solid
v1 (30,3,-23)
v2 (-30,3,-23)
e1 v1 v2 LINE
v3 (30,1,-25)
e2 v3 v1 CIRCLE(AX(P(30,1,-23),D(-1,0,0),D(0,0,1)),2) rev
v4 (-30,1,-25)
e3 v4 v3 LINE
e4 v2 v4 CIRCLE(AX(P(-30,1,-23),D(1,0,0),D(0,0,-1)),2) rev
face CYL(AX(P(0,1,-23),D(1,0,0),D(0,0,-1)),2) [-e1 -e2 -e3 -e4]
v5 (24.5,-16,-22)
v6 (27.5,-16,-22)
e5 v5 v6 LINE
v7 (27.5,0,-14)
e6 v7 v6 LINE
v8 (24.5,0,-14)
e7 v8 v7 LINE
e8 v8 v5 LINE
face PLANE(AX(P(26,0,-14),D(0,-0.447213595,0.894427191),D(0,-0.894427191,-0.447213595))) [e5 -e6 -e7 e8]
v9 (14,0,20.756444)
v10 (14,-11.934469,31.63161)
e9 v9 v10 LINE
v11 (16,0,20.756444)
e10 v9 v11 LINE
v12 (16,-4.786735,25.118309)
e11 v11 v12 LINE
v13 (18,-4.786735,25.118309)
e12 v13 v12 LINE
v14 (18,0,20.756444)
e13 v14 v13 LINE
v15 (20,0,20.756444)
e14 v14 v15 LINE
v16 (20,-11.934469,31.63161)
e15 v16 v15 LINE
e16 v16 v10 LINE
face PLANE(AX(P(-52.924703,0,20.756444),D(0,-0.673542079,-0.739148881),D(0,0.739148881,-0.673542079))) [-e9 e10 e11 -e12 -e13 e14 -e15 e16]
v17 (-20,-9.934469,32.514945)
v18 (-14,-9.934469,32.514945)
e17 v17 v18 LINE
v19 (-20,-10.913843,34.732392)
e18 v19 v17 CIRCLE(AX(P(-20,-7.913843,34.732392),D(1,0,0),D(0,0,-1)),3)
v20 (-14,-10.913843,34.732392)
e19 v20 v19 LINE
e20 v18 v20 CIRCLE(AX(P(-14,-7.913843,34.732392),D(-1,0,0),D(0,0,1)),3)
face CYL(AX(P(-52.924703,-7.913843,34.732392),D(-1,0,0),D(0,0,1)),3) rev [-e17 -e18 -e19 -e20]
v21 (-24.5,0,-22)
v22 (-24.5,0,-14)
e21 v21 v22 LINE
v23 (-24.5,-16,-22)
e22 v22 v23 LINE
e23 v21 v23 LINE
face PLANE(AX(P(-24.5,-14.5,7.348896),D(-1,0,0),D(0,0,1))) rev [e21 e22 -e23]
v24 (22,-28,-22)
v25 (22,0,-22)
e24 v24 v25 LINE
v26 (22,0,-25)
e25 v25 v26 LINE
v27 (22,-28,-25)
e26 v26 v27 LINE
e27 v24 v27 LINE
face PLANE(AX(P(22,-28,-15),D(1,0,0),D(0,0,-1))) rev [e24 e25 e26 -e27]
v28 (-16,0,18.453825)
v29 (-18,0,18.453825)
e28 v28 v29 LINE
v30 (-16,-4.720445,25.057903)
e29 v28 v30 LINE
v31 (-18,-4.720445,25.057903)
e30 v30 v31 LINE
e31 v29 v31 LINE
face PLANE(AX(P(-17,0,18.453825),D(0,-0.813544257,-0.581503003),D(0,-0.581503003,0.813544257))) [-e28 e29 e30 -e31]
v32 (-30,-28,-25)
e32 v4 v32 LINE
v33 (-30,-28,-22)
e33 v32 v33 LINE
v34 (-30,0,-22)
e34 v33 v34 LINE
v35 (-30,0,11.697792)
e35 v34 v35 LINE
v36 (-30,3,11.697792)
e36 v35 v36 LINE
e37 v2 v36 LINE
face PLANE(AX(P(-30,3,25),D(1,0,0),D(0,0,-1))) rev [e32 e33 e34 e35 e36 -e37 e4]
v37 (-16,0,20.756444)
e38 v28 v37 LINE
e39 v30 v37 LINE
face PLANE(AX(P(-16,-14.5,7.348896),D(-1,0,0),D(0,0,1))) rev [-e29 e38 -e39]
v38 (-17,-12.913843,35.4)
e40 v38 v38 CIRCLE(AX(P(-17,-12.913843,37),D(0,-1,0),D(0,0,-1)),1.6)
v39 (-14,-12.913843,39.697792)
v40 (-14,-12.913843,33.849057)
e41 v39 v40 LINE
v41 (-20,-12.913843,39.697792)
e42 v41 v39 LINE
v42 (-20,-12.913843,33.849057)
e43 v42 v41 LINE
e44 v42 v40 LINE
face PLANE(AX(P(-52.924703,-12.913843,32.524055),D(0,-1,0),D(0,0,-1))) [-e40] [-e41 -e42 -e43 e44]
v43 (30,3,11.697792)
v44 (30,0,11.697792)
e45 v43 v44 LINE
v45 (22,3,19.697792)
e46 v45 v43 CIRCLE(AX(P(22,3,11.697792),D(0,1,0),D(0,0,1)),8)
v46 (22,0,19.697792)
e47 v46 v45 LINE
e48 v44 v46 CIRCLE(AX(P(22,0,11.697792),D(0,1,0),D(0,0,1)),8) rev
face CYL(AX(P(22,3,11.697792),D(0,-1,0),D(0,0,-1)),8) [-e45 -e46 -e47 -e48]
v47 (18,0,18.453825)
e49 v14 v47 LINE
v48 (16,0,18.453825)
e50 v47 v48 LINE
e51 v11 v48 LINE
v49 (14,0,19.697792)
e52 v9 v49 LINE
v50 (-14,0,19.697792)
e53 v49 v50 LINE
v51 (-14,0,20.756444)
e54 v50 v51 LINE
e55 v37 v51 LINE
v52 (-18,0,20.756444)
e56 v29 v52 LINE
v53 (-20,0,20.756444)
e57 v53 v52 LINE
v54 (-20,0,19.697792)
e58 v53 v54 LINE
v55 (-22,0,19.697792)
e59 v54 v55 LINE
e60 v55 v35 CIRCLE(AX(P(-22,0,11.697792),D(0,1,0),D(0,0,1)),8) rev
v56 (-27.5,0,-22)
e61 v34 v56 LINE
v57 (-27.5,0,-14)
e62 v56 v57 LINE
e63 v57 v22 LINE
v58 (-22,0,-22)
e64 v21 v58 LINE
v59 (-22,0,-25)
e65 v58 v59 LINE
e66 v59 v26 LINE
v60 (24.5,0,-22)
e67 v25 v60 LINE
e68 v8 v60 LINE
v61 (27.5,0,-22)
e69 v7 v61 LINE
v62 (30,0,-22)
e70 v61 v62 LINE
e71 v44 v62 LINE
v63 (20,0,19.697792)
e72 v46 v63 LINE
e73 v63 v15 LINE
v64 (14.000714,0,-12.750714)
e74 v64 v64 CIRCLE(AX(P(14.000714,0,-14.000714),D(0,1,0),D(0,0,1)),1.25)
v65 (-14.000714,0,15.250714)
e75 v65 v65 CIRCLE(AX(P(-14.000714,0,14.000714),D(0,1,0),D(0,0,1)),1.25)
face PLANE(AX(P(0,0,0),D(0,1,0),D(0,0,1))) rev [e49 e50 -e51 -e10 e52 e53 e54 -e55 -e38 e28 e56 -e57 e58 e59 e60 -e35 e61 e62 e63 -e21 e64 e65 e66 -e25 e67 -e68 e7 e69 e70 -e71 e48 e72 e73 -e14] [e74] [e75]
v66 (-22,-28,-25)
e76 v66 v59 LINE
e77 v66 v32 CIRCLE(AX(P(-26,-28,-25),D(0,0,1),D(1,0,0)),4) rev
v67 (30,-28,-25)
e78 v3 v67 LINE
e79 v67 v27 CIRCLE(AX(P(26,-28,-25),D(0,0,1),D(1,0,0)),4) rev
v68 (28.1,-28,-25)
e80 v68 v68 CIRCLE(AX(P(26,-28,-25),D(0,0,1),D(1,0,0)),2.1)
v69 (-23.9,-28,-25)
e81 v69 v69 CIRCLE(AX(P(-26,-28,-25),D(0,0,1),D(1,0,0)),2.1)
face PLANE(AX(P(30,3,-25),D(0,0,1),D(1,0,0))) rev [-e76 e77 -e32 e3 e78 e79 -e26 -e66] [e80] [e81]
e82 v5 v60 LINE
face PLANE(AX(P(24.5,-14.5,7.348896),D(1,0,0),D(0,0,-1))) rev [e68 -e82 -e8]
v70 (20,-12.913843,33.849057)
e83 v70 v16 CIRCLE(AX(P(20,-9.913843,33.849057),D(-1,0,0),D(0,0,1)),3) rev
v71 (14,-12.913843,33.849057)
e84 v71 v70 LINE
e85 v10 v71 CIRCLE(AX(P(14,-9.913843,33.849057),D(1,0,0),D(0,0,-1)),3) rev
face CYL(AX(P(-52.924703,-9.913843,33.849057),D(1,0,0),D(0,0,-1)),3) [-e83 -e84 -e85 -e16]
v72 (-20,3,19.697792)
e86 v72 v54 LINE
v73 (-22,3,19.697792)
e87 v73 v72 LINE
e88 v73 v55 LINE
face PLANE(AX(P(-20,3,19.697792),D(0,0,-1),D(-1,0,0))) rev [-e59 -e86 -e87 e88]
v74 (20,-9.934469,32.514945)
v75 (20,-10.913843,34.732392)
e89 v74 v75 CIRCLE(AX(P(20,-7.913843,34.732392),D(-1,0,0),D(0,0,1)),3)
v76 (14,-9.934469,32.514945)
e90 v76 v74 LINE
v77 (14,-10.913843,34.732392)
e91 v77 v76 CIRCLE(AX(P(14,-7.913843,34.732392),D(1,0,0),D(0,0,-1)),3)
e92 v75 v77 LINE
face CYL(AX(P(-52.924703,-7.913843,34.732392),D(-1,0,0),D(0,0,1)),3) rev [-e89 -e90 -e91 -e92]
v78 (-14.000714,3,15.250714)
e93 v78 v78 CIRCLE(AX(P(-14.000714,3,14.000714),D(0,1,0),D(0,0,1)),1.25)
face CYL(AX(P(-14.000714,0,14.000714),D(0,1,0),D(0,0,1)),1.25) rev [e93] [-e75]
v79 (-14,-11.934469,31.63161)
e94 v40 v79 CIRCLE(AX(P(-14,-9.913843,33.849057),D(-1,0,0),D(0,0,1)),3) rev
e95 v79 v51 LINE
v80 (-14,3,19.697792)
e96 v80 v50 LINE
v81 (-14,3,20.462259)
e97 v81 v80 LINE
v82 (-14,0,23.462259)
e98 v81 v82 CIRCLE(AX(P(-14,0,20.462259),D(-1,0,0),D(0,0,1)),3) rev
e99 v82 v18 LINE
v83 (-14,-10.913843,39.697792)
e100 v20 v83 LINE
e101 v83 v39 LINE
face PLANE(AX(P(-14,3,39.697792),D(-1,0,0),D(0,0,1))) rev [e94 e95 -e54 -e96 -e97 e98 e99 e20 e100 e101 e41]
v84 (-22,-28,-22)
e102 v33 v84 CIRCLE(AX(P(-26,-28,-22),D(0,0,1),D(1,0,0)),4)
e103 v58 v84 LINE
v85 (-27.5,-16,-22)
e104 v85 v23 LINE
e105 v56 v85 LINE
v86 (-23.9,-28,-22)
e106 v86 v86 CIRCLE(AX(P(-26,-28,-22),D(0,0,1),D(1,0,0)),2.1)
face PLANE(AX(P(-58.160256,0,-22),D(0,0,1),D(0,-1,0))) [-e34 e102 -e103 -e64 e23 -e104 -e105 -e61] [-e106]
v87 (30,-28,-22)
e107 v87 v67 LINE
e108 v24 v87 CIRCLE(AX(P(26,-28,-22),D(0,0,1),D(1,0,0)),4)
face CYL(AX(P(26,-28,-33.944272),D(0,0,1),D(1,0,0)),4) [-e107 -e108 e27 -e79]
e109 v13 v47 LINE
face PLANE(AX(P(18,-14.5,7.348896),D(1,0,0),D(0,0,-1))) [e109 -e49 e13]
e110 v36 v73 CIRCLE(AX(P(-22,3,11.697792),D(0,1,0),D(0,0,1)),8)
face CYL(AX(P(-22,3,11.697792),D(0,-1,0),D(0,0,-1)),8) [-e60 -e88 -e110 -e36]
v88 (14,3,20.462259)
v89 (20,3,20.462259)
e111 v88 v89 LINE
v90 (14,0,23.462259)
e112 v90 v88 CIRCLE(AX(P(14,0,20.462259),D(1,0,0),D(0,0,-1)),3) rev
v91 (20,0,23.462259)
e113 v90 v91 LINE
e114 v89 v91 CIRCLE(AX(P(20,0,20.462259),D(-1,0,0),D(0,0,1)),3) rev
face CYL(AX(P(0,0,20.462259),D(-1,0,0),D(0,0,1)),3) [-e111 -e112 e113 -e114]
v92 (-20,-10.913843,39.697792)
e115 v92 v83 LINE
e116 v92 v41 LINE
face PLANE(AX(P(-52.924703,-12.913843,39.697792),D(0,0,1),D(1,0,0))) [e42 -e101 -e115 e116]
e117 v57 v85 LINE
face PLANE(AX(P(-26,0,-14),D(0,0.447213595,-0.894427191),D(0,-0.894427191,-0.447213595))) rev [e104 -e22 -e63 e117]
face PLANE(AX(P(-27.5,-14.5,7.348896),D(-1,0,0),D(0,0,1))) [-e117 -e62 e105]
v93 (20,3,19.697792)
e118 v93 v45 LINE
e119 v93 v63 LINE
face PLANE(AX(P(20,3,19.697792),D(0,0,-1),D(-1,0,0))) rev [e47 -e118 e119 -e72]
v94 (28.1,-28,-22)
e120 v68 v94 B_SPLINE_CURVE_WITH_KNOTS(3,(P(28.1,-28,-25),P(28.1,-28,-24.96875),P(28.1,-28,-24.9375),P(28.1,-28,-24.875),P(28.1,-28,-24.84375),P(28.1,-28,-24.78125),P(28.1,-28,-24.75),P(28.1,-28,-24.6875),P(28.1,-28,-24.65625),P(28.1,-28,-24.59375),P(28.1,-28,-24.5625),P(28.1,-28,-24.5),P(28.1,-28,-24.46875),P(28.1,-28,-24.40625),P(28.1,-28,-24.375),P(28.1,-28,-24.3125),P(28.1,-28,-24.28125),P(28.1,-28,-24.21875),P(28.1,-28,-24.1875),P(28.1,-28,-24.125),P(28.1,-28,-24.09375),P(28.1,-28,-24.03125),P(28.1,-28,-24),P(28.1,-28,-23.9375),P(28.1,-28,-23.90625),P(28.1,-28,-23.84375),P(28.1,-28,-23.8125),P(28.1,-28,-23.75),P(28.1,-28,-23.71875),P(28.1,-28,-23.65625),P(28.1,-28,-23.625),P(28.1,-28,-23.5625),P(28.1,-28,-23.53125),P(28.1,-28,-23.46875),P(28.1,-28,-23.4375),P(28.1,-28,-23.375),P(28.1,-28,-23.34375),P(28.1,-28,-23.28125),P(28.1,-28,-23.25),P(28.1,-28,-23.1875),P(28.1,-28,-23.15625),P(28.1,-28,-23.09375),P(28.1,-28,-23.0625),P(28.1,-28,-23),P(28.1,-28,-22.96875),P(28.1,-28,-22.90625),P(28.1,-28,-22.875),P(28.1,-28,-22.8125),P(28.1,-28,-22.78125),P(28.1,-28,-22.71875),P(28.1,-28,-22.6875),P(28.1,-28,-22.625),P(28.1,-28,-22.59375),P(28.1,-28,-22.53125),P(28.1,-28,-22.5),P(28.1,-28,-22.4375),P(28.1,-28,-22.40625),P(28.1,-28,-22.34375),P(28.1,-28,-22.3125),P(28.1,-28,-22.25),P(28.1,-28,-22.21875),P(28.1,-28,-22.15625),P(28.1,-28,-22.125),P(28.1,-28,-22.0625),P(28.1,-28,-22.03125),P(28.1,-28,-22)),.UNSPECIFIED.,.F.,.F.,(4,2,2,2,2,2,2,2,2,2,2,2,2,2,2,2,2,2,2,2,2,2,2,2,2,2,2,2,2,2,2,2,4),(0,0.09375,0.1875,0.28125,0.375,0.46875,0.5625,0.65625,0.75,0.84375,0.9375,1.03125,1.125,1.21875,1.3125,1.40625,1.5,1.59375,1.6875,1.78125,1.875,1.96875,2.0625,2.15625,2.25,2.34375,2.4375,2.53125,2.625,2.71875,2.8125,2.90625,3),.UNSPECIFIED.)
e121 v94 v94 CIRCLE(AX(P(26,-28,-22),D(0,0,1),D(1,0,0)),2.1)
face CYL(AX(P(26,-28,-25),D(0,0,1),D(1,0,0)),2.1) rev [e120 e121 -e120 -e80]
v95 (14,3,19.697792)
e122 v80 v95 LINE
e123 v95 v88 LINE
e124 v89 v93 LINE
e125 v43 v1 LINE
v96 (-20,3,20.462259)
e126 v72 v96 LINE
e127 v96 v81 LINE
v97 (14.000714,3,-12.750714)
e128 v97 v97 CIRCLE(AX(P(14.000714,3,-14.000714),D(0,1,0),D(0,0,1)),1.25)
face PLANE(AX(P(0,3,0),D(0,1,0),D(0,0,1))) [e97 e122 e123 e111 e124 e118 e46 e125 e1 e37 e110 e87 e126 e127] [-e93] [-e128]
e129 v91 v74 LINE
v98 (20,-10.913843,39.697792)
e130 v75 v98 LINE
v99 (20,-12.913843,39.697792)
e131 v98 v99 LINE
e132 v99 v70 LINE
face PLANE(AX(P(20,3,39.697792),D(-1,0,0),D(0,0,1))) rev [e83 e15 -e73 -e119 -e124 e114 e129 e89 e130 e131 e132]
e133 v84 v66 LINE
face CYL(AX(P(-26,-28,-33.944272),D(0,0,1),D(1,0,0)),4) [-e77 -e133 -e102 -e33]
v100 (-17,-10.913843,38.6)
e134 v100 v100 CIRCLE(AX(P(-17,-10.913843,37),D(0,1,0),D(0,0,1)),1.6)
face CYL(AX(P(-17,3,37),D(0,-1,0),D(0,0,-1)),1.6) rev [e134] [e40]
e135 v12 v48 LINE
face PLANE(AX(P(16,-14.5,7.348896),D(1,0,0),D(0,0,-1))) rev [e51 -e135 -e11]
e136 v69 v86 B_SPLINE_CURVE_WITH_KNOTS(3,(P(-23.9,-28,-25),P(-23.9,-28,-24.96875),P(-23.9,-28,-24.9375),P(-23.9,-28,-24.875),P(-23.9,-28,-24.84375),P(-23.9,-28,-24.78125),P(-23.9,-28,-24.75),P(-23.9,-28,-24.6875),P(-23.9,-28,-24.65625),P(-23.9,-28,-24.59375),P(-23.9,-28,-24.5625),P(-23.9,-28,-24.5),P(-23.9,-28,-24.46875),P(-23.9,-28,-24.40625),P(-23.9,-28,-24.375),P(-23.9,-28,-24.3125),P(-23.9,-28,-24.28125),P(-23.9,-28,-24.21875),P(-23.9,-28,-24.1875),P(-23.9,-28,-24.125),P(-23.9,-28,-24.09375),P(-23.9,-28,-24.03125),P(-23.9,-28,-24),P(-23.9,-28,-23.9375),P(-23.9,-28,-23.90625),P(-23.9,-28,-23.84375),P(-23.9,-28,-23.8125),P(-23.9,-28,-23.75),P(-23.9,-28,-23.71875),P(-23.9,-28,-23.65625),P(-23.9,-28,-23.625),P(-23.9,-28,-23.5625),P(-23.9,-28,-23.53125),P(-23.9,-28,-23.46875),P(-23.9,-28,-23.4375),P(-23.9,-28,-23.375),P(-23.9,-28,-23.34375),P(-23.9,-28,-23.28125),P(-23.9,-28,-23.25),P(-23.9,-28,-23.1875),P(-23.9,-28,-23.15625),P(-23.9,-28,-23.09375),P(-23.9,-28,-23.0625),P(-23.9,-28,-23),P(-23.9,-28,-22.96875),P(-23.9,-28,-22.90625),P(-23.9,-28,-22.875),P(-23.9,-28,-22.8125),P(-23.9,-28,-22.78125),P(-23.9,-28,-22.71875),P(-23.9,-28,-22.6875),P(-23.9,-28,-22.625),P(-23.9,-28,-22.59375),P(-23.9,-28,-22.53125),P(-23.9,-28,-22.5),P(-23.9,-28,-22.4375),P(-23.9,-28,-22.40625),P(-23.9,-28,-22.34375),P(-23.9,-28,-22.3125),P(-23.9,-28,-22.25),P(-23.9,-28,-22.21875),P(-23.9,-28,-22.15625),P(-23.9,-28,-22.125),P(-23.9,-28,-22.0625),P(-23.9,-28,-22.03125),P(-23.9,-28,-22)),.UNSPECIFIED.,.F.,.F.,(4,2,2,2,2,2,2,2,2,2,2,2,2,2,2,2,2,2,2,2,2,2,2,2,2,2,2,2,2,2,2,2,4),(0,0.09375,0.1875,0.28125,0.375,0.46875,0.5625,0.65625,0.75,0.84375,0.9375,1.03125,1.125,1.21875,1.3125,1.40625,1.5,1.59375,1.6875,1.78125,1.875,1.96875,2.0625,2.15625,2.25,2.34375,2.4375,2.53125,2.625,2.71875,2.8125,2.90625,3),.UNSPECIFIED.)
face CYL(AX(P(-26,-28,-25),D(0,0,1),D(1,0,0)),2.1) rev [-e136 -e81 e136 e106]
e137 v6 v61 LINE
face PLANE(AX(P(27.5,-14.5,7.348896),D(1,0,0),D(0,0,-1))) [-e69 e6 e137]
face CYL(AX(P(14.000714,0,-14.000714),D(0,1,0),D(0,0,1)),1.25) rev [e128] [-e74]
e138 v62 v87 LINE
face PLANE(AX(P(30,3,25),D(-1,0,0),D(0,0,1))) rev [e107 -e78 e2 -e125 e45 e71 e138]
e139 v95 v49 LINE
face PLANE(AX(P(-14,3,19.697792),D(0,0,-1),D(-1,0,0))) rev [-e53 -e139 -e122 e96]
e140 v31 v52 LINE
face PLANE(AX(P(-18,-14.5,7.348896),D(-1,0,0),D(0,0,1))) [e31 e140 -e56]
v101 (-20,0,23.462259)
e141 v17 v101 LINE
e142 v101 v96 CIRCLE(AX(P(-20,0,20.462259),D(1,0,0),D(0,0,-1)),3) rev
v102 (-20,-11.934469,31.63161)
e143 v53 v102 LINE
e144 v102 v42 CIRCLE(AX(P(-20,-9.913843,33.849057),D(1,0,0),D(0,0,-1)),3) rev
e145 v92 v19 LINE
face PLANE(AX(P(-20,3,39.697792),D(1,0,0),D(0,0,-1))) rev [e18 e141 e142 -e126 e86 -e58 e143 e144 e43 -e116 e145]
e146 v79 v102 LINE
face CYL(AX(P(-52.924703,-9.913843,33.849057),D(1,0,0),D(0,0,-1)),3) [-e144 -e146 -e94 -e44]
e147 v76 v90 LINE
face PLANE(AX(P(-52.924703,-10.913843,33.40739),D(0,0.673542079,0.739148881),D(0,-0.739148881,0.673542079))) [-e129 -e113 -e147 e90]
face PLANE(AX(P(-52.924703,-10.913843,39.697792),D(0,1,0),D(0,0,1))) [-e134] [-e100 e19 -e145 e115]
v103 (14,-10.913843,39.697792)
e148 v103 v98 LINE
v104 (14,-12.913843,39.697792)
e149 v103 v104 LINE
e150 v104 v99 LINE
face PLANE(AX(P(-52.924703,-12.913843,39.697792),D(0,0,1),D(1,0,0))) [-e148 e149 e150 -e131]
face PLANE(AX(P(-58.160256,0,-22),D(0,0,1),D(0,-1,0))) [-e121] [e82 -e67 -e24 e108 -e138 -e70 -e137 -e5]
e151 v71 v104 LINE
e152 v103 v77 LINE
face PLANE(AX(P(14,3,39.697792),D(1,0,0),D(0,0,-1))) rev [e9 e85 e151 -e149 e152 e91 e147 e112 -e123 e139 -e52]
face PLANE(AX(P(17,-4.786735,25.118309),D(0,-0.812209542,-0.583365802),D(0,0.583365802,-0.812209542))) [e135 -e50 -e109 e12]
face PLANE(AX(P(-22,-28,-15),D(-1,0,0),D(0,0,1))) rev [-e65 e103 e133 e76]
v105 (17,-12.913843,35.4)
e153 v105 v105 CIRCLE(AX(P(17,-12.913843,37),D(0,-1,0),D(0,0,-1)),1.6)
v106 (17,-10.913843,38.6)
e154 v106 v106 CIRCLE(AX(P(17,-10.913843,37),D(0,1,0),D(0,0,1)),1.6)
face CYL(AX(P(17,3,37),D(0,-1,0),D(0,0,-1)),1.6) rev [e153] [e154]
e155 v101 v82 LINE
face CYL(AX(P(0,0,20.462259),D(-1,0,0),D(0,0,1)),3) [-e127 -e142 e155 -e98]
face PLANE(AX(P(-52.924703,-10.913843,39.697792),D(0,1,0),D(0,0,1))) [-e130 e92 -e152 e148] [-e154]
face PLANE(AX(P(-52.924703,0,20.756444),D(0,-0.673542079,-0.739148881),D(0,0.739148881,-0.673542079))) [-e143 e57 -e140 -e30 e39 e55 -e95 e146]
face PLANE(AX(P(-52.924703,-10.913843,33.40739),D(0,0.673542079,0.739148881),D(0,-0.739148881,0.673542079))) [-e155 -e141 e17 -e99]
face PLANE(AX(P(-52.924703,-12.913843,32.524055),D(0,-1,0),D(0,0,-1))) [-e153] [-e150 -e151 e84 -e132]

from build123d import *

# Parameters (mm, degrees)
SKETCH_1_W          = 60
SKETCH_1_H          = 50
EXTRUDE_1_DEPTH     = 3
SKETCH_2_R          = 1.25
CUT_EXTRUDE_1_DEPTH = 3
SKETCH_4_W          = 3
SKETCH_4_H          = 28
EXTRUDE_3_DEPTH     = 60
SKETCH_5_W          = 44
SKETCH_5_H          = 28
CUT_EXTRUDE_2_DEPTH = 10
EXTRUDE_4_DEPTH     = 3
SKETCH_8_R          = 2.1
CUT_EXTRUDE_3_DEPTH = 65.288412642
EXTRUDE_5_DEPTH     = 60
SKETCH_9_W          = 10
SKETCH_9_H          = 20
SKETCH_9_W_2        = 28
CUT_EXTRUDE_4_DEPTH = 54.293490307
SKETCH_11_R         = 1.6
CUT_EXTRUDE_5_DEPTH = 54.293490307
SKETCH_12_W         = 1.537741429
SKETCH_12_H         = 3
CUT_EXTRUDE_6_DEPTH = 72.413687212
FILLET_1_R          = 8
FILLET_2_R          = 8
FILLET_3_R          = 3
FILLET_4_R          = 3
FILLET_5_R          = 2
RIB_2_REACH         = 77.736
SKETCH_14_WALL_W    = 171.36018765
SKETCH_14_WALL_H    = 3
RIB_3_REACH         = 77.736
SKETCH_16_WALL_W    = 171.36018765
SKETCH_16_WALL_H    = 3
RIB_4_REACH         = 71.346
SKETCH_17_WALL_W    = 148.898052794
SKETCH_17_WALL_H    = 2
RIB_5_REACH         = 71.346
SKETCH_18_WALL_W    = 148.810340372
SKETCH_18_WALL_H    = 2


with BuildPart() as part:
    # 草图1 → 凸台-拉伸1 (new body)
    with BuildSketch(Plane(origin=(0, 0, 0), x_dir=(1, 0, 0), z_dir=(0, 1, 0))):
        Rectangle(SKETCH_1_W, SKETCH_1_H)
    extrude(amount=EXTRUDE_1_DEPTH)

    # 草图2 → 切除-拉伸1 (cut)
    with BuildSketch(Plane(origin=(0, 3, 0), x_dir=(1, 0, 0), z_dir=(0, 1, 0))):
        with Locations(Location((-14.000714267, -14.000714267, 0), (0, 0, 270))):
            Circle(SKETCH_2_R)
        with Locations(Location((14.000714267, 14.000714267, 0), (0, 0, 270))):
            Circle(SKETCH_2_R)
    extrude(amount=-CUT_EXTRUDE_1_DEPTH, mode=Mode.SUBTRACT)

    # 草图4 → 凸台-拉伸3 (add)
    with BuildSketch(Plane(origin=(30, 0, 0), x_dir=(0, 0, -1), z_dir=(1, 0, 0))):
        with Locations((23.5, -14)):
            Rectangle(SKETCH_4_W, SKETCH_4_H)
    extrude(amount=-EXTRUDE_3_DEPTH)

    # 草图5 → 切除-拉伸2 (cut)
    with BuildSketch(Plane(origin=(0, 0, -25), x_dir=(-1, 0, 0), z_dir=(0, 0, -1))):
        with Locations((0, -14)):
            Rectangle(SKETCH_5_W, SKETCH_5_H)
    extrude(amount=-CUT_EXTRUDE_2_DEPTH, mode=Mode.SUBTRACT)

    # 草图7 → 凸台-拉伸4 (add)
    with BuildSketch(Plane.XY.offset(-22)):
        with BuildLine():
            Line((-30, -28), (-22, -28))
            ThreePointArc((-22, -28), (-26, -32), (-30, -28))
        make_face()
        with BuildLine():
            Line((22, -28), (30, -28))
            ThreePointArc((30, -28), (26, -32), (22, -28))
        make_face()
    extrude(amount=-EXTRUDE_4_DEPTH)

    # 草图8 → 切除-拉伸3 (cut, through all)
    with BuildSketch(Plane.XY.offset(-22)):
        with Locations((26, -28)):
            Circle(SKETCH_8_R)
        with Locations((-26, -28)):
            Circle(SKETCH_8_R)
    extrude(amount=-CUT_EXTRUDE_3_DEPTH, mode=Mode.SUBTRACT)

    # 草图3 → 凸台-拉伸5 (add)
    with BuildSketch(Plane(origin=(30, 0, 0), x_dir=(0, 0, -1), z_dir=(1, 0, 0))):
        Polygon((-20.756443745, 0), (-32.524054991, -12.913843028), (-39.697792397, -12.913843028), (-39.697792397, -10.913843028), (-33.407389674, -10.913843028), (-23.462258571, 0), align=None)
    extrude(amount=-EXTRUDE_5_DEPTH)

    # 草图9 → 切除-拉伸4 (cut, through all)
    with BuildSketch(Plane.XZ.offset(12.913843028)):
        with Locations((25, 29.697792397)):
            Rectangle(SKETCH_9_W, SKETCH_9_H)
        with Locations((0, 29.697792397)):
            Rectangle(SKETCH_9_W_2, SKETCH_9_H)
        with Locations((-25, 29.697792397)):
            Rectangle(SKETCH_9_W, SKETCH_9_H)
    extrude(amount=-CUT_EXTRUDE_4_DEPTH, mode=Mode.SUBTRACT)

    # 草图11 → 切除-拉伸5 (cut, through all)
    with BuildSketch(Plane.XZ.offset(12.913843028)):
        with Locations(Location((17, 37, 0), (0, 0, 270))):
            Circle(SKETCH_11_R)
        with Locations(Location((-17, 37, 0), (0, 0, 270))):
            Circle(SKETCH_11_R)
    extrude(amount=-CUT_EXTRUDE_5_DEPTH, mode=Mode.SUBTRACT)

    # 草图12 → 切除-拉伸6 (cut, through all)
    with BuildSketch(Plane(origin=(20, 0, 0), x_dir=(0, 0, -1), z_dir=(1, 0, 0))):
        with Locations((-24.231129286, 1.5)):
            Rectangle(SKETCH_12_W, SKETCH_12_H)
    extrude(amount=-CUT_EXTRUDE_6_DEPTH, mode=Mode.SUBTRACT)

    # 圆角1
    fillet_1_edges = [part.edges().sort_by_distance(p)[0] for p in [
        (30, 1.5, 19.697792397),
    ]]
    fillet(fillet_1_edges, radius=FILLET_1_R)

    # 圆角2
    fillet_2_edges = [part.edges().sort_by_distance(p)[0] for p in [
        (-30, 1.5, 19.697792397),
    ]]
    fillet(fillet_2_edges, radius=FILLET_2_R)

    # 圆角3
    fillet_3_edges = [part.edges().sort_by_distance(p)[0] for p in [
        (17, 3, 23.462258571),
        (-17, 3, 23.462258571),
    ]]
    fillet(fillet_3_edges, radius=FILLET_3_R - 0.0001)  # a hair under: the kernel refuses the full size

    # 圆角4
    fillet_4_edges = [part.edges().sort_by_distance(p)[0] for p in [
        (-17, -10.913843028, 33.407389674),
        (17, -10.913843028, 33.407389674),
        (-17, -12.913843028, 32.524054991),
        (17, -12.913843028, 32.524054991),
    ]]
    fillet(fillet_4_edges, radius=FILLET_4_R)

    # 圆角5
    fillet_5_edges = [part.edges().sort_by_distance(p)[0] for p in [
        (0, 3, -25),
    ]]
    fillet(fillet_5_edges, radius=FILLET_5_R)

    # 草图14 wall → 筋2 (add, up to next)
    with BuildSketch(Plane(origin=(26, -8, -18), x_dir=(0, -0.894427191, -0.4472135955), z_dir=(0, 0.4472135955, -0.894427191)), mode=Mode.PRIVATE) as rib_2_sk1:
        Rectangle(SKETCH_14_WALL_W, SKETCH_14_WALL_H)
    rib_2_tool1 = extrude(rib_2_sk1.sketch, amount=RIB_2_REACH, mode=Mode.PRIVATE) - part.part
    add(rib_2_tool1.solids().sort_by_distance((26, -8, -18))[0])

    # 草图16 wall → 筋3 (add, up to next)
    with BuildSketch(Plane(origin=(-26, -8, -18), x_dir=(0, -0.894427191, -0.4472135955), z_dir=(0, -0.4472135955, 0.894427191)), mode=Mode.PRIVATE) as rib_3_sk1:
        Rectangle(SKETCH_16_WALL_W, SKETCH_16_WALL_H)
    rib_3_tool1 = extrude(rib_3_sk1.sketch, amount=-RIB_3_REACH, mode=Mode.PRIVATE) - part.part
    add(rib_3_tool1.solids().sort_by_distance((-26, -8, -18))[0])

    # 草图17 wall → 筋4 (add, up to next)
    with BuildSketch(Plane(origin=(17, -2.393367573, 21.786066703), x_dir=(0, 0.583365802334, -0.81220954234), z_dir=(0, 0.81220954234, 0.583365802334)), mode=Mode.PRIVATE) as rib_4_sk1:
        Rectangle(SKETCH_17_WALL_W, SKETCH_17_WALL_H)
    rib_4_tool1 = extrude(rib_4_sk1.sketch, amount=RIB_4_REACH, mode=Mode.PRIVATE) - part.part
    add(rib_4_tool1.solids().sort_by_distance((17, -2.393367573, 21.786066703))[0])

    # 草图18 wall → 筋5 (add, up to next)
    with BuildSketch(Plane(origin=(-17, -2.360222573, 21.75586365), x_dir=(0, -0.581503003153, 0.813544256525), z_dir=(0, 0.813544256525, 0.581503003153)), mode=Mode.PRIVATE) as rib_5_sk1:
        Rectangle(SKETCH_18_WALL_W, SKETCH_18_WALL_H)
    rib_5_tool1 = extrude(rib_5_sk1.sketch, amount=RIB_5_REACH, mode=Mode.PRIVATE) - part.part
    add(rib_5_tool1.solids().sort_by_distance((-17, -2.360222573, 21.75586365))[0])


solid = part.part
